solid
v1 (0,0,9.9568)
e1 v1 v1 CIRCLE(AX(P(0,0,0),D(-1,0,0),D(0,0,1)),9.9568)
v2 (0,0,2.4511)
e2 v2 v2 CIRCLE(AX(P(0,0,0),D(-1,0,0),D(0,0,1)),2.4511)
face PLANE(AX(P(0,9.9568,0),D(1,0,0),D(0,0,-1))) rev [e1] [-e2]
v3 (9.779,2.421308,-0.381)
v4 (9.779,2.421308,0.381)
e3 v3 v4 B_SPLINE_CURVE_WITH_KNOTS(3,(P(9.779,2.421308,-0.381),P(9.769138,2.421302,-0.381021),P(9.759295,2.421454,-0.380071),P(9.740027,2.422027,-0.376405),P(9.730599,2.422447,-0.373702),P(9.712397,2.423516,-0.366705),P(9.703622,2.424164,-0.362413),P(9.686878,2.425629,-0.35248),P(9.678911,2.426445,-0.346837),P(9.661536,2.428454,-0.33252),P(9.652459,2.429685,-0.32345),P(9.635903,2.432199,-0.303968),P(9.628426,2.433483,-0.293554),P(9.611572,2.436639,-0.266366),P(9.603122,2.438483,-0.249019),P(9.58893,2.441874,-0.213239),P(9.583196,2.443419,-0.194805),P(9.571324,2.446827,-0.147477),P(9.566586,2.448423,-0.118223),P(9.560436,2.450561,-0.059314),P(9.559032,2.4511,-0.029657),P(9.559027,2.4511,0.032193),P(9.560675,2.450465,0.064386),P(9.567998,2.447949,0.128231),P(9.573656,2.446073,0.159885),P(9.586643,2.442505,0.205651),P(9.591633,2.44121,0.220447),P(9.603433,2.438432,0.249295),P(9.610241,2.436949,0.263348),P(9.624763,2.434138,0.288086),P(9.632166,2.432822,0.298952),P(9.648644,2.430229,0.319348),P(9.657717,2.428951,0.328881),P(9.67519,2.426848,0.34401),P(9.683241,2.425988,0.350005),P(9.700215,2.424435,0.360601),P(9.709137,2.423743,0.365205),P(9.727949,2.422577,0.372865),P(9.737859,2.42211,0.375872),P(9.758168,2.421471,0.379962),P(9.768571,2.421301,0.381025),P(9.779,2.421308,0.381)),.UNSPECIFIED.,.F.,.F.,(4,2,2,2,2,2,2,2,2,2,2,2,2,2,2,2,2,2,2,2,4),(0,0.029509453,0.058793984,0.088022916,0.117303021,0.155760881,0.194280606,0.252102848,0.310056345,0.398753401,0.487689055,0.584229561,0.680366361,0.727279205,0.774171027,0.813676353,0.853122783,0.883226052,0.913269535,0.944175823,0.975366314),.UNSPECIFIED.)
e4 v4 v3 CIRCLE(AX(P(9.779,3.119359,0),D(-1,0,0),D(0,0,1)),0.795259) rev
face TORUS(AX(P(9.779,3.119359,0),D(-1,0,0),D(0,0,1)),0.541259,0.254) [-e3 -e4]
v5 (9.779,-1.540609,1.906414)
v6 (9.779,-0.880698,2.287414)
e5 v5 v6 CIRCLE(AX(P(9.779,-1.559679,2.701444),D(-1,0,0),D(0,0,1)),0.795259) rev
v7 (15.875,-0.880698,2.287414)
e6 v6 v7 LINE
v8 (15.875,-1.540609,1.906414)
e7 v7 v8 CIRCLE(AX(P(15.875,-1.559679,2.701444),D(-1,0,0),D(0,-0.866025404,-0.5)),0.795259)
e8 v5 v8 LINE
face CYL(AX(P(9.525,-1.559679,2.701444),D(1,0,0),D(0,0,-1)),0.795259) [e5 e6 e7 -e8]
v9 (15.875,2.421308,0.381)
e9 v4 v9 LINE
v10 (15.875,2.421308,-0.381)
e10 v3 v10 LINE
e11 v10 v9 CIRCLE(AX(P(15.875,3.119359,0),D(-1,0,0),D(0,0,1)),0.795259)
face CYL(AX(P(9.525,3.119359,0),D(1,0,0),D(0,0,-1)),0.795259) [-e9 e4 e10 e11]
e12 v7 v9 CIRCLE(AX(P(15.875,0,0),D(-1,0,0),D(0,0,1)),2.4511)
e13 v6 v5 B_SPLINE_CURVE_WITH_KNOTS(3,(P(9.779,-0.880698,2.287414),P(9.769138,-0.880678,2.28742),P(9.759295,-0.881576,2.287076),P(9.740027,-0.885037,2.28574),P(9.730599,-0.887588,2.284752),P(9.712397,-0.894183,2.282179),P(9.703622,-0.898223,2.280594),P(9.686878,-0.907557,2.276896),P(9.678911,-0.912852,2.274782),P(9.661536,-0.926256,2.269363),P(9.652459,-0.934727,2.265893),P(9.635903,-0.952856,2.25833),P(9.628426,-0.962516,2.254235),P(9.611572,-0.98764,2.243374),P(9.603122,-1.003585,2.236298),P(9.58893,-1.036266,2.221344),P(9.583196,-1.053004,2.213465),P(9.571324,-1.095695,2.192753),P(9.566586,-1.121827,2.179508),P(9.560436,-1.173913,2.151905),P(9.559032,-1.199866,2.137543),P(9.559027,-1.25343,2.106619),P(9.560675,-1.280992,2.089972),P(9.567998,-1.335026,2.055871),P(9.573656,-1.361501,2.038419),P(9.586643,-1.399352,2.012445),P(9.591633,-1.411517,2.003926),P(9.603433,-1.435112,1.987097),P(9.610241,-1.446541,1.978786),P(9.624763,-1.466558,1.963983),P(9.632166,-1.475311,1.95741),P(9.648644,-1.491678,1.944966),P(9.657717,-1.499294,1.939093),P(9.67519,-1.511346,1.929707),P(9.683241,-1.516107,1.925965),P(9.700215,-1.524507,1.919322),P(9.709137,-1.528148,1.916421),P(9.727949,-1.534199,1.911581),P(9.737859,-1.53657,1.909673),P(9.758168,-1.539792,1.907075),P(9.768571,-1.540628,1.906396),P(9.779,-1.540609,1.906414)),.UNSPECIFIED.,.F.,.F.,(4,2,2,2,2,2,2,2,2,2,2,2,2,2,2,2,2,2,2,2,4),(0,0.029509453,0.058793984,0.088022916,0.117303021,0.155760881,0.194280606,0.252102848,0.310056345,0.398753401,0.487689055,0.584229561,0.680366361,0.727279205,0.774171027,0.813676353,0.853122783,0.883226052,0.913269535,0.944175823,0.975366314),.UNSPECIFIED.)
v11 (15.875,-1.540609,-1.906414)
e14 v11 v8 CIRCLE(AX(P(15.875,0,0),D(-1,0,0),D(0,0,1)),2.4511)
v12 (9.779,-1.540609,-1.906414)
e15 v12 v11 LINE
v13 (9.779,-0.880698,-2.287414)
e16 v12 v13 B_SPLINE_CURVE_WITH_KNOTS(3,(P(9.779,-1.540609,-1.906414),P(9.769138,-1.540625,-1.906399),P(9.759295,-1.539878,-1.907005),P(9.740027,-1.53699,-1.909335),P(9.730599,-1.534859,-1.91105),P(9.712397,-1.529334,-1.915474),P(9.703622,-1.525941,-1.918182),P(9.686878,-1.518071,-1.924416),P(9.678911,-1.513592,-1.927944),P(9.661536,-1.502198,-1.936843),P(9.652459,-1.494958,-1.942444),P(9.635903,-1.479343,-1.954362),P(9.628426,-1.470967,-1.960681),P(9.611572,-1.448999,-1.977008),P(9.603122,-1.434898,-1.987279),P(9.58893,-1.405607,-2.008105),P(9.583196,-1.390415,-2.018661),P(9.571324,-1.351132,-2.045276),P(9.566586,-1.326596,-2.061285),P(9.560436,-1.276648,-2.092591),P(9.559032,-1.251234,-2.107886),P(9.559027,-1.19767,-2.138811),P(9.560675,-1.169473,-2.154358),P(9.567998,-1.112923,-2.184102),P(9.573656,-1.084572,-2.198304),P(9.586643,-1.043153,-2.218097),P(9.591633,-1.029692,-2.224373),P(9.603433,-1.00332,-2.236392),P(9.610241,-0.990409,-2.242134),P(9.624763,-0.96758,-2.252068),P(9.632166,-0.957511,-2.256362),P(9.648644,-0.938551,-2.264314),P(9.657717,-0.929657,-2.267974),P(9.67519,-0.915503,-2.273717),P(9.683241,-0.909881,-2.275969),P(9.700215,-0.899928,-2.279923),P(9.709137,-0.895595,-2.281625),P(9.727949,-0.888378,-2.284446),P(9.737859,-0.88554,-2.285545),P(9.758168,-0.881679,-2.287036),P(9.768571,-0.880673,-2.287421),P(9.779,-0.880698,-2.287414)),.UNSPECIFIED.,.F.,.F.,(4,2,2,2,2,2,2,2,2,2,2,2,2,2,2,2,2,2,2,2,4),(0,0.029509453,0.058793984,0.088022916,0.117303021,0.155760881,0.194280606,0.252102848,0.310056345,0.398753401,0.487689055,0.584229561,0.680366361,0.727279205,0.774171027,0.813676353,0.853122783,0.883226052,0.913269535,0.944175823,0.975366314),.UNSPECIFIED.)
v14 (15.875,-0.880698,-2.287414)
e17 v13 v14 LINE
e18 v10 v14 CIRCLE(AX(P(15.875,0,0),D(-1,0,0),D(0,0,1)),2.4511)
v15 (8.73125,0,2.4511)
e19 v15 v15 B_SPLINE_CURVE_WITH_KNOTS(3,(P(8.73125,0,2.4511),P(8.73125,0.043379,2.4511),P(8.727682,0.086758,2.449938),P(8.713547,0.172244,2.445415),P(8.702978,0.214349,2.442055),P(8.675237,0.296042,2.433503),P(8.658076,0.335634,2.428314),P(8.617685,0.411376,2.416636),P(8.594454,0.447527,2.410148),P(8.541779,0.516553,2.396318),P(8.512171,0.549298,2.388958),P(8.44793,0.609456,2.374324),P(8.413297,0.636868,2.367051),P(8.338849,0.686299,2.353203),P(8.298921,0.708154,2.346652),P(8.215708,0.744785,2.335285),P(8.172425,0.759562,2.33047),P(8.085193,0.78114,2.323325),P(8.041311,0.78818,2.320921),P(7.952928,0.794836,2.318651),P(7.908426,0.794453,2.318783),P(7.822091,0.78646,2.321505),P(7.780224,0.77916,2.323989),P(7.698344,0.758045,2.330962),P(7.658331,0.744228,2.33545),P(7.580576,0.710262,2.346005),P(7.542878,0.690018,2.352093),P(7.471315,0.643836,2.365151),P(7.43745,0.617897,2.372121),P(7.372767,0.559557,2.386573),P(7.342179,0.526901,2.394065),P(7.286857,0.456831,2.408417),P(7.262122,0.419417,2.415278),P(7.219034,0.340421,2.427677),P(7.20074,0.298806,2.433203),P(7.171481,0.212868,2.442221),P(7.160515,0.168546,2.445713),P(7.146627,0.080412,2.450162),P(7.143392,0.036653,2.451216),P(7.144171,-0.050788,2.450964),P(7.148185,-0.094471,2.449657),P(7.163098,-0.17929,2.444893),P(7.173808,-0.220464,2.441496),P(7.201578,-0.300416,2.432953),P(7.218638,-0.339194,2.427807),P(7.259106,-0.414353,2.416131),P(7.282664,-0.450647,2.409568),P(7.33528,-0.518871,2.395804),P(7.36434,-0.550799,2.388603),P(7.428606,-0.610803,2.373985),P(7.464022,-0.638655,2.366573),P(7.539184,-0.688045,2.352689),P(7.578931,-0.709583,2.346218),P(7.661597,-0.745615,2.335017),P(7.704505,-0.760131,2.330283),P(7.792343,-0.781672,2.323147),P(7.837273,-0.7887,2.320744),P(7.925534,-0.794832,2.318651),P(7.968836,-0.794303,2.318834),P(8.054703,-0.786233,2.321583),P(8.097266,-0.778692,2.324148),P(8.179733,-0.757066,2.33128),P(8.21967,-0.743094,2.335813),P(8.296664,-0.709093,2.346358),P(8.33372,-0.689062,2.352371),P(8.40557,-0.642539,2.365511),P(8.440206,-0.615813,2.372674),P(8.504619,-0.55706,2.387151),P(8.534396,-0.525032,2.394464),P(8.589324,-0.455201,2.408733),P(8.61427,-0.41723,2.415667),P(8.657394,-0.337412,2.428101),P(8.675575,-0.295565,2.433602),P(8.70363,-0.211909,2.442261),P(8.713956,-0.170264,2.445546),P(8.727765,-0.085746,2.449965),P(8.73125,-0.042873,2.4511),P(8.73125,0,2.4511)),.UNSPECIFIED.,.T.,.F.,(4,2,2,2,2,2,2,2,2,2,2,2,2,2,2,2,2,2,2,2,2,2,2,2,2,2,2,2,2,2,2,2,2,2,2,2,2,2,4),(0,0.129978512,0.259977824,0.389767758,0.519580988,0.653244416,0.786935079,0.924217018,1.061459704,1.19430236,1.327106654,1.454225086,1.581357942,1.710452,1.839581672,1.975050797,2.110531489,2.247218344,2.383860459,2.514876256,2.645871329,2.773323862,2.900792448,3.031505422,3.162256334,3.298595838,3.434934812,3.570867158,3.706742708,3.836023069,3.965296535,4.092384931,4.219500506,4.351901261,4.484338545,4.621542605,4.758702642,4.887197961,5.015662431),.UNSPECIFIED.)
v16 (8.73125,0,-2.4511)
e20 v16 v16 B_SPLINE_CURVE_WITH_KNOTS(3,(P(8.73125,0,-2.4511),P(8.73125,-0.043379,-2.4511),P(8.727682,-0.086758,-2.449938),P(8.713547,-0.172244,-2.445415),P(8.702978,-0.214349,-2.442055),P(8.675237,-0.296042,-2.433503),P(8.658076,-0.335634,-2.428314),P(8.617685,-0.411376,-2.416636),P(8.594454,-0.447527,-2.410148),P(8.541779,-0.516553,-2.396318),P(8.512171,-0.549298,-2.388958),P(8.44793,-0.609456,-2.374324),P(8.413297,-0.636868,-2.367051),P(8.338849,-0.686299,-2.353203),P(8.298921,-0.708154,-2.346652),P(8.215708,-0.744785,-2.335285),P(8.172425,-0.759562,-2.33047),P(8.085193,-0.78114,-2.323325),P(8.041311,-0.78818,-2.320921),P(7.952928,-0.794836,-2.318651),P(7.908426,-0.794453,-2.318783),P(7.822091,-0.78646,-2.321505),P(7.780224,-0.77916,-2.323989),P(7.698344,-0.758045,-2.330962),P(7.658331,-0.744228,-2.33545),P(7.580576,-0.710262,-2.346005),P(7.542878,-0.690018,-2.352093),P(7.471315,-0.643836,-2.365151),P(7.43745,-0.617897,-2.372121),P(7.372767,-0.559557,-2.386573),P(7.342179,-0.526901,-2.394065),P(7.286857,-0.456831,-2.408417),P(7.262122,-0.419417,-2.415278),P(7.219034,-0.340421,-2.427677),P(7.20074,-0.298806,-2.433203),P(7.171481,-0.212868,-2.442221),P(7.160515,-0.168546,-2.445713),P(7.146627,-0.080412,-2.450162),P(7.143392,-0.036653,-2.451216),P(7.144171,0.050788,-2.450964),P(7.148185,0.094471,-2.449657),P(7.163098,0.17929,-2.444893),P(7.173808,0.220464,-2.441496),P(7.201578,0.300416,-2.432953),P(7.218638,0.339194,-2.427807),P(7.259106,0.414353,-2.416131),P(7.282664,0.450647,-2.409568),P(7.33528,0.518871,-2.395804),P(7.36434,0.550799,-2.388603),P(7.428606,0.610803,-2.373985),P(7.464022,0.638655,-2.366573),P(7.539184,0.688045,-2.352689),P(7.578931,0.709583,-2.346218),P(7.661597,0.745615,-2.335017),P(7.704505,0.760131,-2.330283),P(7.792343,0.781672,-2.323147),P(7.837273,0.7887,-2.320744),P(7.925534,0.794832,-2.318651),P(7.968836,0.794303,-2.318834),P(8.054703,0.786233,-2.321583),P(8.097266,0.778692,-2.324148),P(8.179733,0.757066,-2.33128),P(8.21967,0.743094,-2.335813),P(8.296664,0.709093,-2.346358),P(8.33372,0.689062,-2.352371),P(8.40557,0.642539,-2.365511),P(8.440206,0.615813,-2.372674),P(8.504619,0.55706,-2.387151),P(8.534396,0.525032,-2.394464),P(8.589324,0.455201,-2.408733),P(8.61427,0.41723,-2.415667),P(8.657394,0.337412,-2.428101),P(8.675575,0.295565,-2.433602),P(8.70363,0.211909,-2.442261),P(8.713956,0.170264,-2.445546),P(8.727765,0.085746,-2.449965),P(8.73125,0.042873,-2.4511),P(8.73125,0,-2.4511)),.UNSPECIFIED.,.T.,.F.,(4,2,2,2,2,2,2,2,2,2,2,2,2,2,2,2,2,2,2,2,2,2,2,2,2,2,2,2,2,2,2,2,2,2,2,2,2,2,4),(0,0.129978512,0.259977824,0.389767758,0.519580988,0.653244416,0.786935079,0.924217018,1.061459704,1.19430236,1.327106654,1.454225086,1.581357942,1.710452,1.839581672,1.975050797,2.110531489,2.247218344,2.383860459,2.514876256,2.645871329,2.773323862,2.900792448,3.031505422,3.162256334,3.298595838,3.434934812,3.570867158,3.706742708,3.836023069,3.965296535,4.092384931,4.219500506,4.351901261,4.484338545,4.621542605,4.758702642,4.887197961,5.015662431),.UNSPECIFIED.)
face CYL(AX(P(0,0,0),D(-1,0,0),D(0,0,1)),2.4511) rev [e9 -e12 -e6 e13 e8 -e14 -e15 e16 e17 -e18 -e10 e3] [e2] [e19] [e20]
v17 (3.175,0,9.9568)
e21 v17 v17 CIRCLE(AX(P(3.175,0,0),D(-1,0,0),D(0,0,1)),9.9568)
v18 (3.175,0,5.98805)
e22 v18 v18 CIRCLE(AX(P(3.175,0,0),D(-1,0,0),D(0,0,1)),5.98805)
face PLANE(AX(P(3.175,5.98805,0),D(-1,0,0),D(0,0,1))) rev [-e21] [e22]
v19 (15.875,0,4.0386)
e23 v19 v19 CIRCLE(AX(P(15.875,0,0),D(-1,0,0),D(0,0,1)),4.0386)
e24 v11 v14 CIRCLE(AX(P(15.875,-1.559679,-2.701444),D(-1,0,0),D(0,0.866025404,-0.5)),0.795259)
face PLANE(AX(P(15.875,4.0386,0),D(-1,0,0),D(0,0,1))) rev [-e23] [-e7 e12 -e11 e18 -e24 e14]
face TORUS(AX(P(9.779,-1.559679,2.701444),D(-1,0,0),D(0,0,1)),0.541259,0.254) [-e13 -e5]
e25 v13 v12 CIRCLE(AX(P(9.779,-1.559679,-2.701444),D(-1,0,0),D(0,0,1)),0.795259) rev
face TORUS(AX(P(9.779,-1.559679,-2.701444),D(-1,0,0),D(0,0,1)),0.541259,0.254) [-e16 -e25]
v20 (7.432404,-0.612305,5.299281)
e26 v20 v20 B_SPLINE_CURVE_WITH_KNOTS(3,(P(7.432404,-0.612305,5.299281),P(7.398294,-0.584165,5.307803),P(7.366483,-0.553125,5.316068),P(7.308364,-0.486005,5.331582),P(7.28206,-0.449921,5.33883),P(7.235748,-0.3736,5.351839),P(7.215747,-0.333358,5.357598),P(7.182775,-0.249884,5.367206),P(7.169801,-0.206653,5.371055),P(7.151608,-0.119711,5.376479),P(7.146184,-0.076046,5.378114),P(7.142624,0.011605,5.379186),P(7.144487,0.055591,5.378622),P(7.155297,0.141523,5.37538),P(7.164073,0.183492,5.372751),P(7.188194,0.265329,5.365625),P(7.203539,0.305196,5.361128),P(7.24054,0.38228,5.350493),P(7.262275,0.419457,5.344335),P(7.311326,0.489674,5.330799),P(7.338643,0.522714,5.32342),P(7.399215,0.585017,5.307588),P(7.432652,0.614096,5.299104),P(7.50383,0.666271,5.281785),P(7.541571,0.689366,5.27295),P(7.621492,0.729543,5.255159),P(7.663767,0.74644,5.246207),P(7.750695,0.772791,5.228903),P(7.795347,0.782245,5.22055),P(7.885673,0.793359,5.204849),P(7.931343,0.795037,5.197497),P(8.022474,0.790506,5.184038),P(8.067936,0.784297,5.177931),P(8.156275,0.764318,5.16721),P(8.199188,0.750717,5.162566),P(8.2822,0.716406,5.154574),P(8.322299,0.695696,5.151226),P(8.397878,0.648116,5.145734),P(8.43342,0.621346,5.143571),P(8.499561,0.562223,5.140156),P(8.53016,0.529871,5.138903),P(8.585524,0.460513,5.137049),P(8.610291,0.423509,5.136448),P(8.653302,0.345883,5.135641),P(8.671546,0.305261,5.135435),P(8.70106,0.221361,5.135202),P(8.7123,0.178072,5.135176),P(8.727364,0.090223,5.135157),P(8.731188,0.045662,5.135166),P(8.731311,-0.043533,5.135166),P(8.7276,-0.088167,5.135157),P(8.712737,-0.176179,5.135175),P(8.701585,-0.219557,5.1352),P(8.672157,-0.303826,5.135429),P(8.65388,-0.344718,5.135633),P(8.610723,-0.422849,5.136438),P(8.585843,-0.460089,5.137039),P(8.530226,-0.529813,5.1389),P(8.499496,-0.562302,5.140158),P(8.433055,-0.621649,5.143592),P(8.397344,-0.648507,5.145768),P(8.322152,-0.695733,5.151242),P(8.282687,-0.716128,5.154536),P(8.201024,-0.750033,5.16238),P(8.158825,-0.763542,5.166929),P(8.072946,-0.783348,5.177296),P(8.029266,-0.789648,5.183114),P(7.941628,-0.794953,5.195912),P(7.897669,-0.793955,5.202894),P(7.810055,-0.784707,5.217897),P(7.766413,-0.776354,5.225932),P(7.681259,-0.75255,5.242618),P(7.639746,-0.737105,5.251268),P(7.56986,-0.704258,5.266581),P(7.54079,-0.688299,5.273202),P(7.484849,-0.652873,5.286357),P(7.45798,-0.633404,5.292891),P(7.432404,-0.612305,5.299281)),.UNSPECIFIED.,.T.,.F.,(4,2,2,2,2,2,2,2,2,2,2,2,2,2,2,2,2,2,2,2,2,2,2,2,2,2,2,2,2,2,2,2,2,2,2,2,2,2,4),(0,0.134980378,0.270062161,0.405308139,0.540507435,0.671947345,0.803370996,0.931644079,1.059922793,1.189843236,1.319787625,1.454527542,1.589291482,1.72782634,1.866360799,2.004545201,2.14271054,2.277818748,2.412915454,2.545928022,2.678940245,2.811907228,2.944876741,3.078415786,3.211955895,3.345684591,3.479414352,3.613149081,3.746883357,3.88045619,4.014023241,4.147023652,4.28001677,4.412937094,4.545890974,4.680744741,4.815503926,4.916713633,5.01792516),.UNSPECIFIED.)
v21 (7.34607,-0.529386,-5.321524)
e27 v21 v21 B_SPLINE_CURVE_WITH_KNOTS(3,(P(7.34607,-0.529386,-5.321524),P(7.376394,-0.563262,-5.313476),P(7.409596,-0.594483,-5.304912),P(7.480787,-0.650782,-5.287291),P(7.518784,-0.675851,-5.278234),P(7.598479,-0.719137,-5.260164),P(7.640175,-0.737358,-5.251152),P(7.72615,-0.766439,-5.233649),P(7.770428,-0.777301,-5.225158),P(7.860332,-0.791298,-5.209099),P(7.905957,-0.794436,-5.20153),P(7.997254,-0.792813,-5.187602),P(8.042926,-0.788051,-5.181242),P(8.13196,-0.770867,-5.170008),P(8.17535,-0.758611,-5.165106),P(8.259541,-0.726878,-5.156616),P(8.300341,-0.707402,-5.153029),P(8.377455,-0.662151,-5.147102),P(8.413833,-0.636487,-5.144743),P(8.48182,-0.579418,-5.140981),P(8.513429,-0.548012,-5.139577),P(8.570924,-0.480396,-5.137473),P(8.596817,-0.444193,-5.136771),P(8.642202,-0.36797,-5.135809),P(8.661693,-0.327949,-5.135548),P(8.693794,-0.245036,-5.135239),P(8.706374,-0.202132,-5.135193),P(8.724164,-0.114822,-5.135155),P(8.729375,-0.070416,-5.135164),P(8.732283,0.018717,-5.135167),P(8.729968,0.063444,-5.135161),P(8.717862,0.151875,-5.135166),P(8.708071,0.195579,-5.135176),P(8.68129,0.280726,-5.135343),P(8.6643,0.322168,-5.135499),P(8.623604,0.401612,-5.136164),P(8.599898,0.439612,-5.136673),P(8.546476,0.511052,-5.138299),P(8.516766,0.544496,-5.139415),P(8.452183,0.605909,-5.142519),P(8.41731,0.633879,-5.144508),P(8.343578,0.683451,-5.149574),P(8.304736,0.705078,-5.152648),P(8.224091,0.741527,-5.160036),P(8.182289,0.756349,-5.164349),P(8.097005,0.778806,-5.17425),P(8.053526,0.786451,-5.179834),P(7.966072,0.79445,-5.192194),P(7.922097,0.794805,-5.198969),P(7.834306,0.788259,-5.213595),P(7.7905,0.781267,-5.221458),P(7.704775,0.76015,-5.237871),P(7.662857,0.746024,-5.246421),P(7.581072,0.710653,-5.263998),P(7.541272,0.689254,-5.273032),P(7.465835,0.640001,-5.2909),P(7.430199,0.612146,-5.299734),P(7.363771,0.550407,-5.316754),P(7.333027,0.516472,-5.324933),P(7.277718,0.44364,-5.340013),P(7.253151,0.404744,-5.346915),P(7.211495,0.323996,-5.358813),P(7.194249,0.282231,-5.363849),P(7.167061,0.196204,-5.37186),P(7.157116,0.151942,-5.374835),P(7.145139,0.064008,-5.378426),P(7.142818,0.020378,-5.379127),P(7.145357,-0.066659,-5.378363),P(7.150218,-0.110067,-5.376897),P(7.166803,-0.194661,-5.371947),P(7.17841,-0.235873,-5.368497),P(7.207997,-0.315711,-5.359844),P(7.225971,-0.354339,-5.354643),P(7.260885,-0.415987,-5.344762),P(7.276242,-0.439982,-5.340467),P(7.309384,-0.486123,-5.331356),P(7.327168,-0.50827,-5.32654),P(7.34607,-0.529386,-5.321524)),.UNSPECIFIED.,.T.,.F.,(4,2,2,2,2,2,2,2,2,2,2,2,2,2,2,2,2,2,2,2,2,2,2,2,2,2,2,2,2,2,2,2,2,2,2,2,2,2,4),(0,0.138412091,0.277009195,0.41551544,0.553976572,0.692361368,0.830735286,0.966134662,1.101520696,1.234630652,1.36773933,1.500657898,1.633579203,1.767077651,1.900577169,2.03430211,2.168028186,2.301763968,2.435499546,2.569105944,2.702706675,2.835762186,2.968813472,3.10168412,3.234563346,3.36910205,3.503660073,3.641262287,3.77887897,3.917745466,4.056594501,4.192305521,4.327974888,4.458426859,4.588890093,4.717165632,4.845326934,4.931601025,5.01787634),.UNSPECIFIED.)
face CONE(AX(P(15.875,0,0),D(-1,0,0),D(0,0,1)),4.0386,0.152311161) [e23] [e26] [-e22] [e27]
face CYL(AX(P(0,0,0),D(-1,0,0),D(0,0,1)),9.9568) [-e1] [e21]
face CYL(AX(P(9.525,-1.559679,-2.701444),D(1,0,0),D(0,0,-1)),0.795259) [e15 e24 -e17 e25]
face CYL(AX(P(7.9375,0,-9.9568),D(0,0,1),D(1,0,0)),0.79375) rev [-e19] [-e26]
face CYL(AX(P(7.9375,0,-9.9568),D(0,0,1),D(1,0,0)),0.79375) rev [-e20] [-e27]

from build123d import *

# Parameters (mm, degrees)
BOSS_EXTRUDE2_DEPTH      = 6.35
FILLET1_R                = 0.254
CIRPATTERN3_COUNT        = 3
FILLET1_OF_CIRPATTERN3_R = 0.254
CUT_EXTRUDE1_DEPTH       = 22.220069761
CUT_EXTRUDE1_DEPTH_BACK  = 22.220069761
SKETCH6_R                = 0.79375


with BuildPart() as part:
    # Sketch3 → Revolve1 (revolve)
    with BuildSketch(Plane.XY, mode=Mode.PRIVATE) as revolve1_sk:
        Polygon((0, 9.9568), (0, 2.4511), (15.875, 2.4511), (15.875, 4.0386), (3.175, 5.98805), (3.175, 9.9568), align=None)
    revolve(revolve1_sk.sketch.rotate(Axis((0, 0, 0), (1, 0, 0)), 90), axis=Axis((0, 0, 0), (1, 0, 0)))

    # Sketch5 → Boss-Extrude2 (add)
    with BuildSketch(Plane.ZY.offset(-15.875)):
        with BuildLine():
            ThreePointArc((-0.381, 2.421307541), (0, 2.4511), (0.381, 2.421307541))
            ThreePointArc((0.381, 2.421307541), (0, 2.3241), (-0.381, 2.421307541))
        make_face()
    boss_extrude2 = extrude(amount=BOSS_EXTRUDE2_DEPTH)

    # Fillet1
    # the kernel refuses this fillet: 0.254 mm, written as the material it takes off along each edge
    with BuildSketch(Plane(origin=(9.525, 3.119358803, 0), x_dir=(0, -0.2692049658318269, 0.9630829073197619), z_dir=(0, 0.9630829073197619, 0.2692049658318269))) as fillet1_piece_1_section:
        with BuildLine():
            CenterArc((0.795258803 - FILLET1_R, FILLET1_R), FILLET1_R, 270, 90)
            Line((0.795258803 - FILLET1_R, 0), (0.795258803, 0))
            Line((0.795258803, 0), (0.795258803, FILLET1_R))
        make_face()
    fillet1_piece_1 = revolve(axis=Axis((9.525, 3.119358803, 0), (1, 0, 0)), revolution_arc=148.766073655, mode=Mode.PRIVATE)
    fillet1_piece_1 = fillet1_piece_1 & Plane(origin=(9.597702858, 0, 0), x_dir=(0, 0, 1), z_dir=(1, 0, 0)) * Cylinder(2.4511, 4, mode=Mode.PRIVATE)
    add(fillet1_piece_1, mode=Mode.SUBTRACT)

    # CirPattern3: Boss-Extrude2 ×3 about axis
    cirpattern3_axis = Axis((0, 0, 0), (1, 0, 0))
    for i in range(1, CIRPATTERN3_COUNT):
        add(boss_extrude2.rotate(cirpattern3_axis, i * 360 / CIRPATTERN3_COUNT))

    # Fillet1 of CirPattern3
    # the kernel refuses this fillet: 0.254 mm, written as the material it takes off along each edge
    with BuildSketch(Plane(origin=(9.525, -1.559679402, 2.701443967), x_dir=(0, -0.699451780773575, -0.7146797928951643), z_dir=(0, -0.7146797928951643, 0.699451780773575))) as fillet1_of_cirpattern3_piece_1_section:
        with BuildLine():
            CenterArc((0.795258803 - FILLET1_OF_CIRPATTERN3_R, FILLET1_OF_CIRPATTERN3_R), FILLET1_OF_CIRPATTERN3_R, 270, 90)
            Line((0.795258803 - FILLET1_OF_CIRPATTERN3_R, 0), (0.795258803, 0))
            Line((0.795258803, 0), (0.795258803, FILLET1_OF_CIRPATTERN3_R))
        make_face()
    fillet1_of_cirpattern3_piece_1 = revolve(axis=Axis((9.525, -1.559679402, 2.701443967), (1, 0, 0)), revolution_arc=148.766073655, mode=Mode.PRIVATE)
    fillet1_of_cirpattern3_piece_1 = fillet1_of_cirpattern3_piece_1 & Plane(origin=(9.597702858, 0, 0), x_dir=(0, 0, 1), z_dir=(1, 0, 0)) * Cylinder(2.4511, 4, mode=Mode.PRIVATE)
    add(fillet1_of_cirpattern3_piece_1, mode=Mode.SUBTRACT)
    with BuildSketch(Plane(origin=(9.525, -1.559679402, -2.701443967), x_dir=(0, 0.968656746605401, -0.24840311442459811), z_dir=(0, -0.24840311442459811, -0.968656746605401))) as fillet1_of_cirpattern3_piece_2_section:
        with BuildLine():
            CenterArc((0.795258803 - FILLET1_OF_CIRPATTERN3_R, FILLET1_OF_CIRPATTERN3_R), FILLET1_OF_CIRPATTERN3_R, 270, 90)
            Line((0.795258803 - FILLET1_OF_CIRPATTERN3_R, 0), (0.795258803, 0))
            Line((0.795258803, 0), (0.795258803, FILLET1_OF_CIRPATTERN3_R))
        make_face()
    fillet1_of_cirpattern3_piece_2 = revolve(axis=Axis((9.525, -1.559679402, -2.701443967), (1, 0, 0)), revolution_arc=148.766073655, mode=Mode.PRIVATE)
    fillet1_of_cirpattern3_piece_2 = fillet1_of_cirpattern3_piece_2 & Plane(origin=(9.597702858, 0, 0), x_dir=(0, 0, 1), z_dir=(1, 0, 0)) * Cylinder(2.4511, 4, mode=Mode.PRIVATE)
    add(fillet1_of_cirpattern3_piece_2, mode=Mode.SUBTRACT)

    # Sketch6 → Cut-Extrude1 (cut, two sides: drawn at the far end of the back side and taken through both)
    with BuildSketch(Plane.XY.offset(-CUT_EXTRUDE1_DEPTH_BACK)):
        with Locations((7.9375, 0)):
            Circle(SKETCH6_R)
    extrude(amount=CUT_EXTRUDE1_DEPTH + CUT_EXTRUDE1_DEPTH_BACK, mode=Mode.SUBTRACT)


solid = part.part
